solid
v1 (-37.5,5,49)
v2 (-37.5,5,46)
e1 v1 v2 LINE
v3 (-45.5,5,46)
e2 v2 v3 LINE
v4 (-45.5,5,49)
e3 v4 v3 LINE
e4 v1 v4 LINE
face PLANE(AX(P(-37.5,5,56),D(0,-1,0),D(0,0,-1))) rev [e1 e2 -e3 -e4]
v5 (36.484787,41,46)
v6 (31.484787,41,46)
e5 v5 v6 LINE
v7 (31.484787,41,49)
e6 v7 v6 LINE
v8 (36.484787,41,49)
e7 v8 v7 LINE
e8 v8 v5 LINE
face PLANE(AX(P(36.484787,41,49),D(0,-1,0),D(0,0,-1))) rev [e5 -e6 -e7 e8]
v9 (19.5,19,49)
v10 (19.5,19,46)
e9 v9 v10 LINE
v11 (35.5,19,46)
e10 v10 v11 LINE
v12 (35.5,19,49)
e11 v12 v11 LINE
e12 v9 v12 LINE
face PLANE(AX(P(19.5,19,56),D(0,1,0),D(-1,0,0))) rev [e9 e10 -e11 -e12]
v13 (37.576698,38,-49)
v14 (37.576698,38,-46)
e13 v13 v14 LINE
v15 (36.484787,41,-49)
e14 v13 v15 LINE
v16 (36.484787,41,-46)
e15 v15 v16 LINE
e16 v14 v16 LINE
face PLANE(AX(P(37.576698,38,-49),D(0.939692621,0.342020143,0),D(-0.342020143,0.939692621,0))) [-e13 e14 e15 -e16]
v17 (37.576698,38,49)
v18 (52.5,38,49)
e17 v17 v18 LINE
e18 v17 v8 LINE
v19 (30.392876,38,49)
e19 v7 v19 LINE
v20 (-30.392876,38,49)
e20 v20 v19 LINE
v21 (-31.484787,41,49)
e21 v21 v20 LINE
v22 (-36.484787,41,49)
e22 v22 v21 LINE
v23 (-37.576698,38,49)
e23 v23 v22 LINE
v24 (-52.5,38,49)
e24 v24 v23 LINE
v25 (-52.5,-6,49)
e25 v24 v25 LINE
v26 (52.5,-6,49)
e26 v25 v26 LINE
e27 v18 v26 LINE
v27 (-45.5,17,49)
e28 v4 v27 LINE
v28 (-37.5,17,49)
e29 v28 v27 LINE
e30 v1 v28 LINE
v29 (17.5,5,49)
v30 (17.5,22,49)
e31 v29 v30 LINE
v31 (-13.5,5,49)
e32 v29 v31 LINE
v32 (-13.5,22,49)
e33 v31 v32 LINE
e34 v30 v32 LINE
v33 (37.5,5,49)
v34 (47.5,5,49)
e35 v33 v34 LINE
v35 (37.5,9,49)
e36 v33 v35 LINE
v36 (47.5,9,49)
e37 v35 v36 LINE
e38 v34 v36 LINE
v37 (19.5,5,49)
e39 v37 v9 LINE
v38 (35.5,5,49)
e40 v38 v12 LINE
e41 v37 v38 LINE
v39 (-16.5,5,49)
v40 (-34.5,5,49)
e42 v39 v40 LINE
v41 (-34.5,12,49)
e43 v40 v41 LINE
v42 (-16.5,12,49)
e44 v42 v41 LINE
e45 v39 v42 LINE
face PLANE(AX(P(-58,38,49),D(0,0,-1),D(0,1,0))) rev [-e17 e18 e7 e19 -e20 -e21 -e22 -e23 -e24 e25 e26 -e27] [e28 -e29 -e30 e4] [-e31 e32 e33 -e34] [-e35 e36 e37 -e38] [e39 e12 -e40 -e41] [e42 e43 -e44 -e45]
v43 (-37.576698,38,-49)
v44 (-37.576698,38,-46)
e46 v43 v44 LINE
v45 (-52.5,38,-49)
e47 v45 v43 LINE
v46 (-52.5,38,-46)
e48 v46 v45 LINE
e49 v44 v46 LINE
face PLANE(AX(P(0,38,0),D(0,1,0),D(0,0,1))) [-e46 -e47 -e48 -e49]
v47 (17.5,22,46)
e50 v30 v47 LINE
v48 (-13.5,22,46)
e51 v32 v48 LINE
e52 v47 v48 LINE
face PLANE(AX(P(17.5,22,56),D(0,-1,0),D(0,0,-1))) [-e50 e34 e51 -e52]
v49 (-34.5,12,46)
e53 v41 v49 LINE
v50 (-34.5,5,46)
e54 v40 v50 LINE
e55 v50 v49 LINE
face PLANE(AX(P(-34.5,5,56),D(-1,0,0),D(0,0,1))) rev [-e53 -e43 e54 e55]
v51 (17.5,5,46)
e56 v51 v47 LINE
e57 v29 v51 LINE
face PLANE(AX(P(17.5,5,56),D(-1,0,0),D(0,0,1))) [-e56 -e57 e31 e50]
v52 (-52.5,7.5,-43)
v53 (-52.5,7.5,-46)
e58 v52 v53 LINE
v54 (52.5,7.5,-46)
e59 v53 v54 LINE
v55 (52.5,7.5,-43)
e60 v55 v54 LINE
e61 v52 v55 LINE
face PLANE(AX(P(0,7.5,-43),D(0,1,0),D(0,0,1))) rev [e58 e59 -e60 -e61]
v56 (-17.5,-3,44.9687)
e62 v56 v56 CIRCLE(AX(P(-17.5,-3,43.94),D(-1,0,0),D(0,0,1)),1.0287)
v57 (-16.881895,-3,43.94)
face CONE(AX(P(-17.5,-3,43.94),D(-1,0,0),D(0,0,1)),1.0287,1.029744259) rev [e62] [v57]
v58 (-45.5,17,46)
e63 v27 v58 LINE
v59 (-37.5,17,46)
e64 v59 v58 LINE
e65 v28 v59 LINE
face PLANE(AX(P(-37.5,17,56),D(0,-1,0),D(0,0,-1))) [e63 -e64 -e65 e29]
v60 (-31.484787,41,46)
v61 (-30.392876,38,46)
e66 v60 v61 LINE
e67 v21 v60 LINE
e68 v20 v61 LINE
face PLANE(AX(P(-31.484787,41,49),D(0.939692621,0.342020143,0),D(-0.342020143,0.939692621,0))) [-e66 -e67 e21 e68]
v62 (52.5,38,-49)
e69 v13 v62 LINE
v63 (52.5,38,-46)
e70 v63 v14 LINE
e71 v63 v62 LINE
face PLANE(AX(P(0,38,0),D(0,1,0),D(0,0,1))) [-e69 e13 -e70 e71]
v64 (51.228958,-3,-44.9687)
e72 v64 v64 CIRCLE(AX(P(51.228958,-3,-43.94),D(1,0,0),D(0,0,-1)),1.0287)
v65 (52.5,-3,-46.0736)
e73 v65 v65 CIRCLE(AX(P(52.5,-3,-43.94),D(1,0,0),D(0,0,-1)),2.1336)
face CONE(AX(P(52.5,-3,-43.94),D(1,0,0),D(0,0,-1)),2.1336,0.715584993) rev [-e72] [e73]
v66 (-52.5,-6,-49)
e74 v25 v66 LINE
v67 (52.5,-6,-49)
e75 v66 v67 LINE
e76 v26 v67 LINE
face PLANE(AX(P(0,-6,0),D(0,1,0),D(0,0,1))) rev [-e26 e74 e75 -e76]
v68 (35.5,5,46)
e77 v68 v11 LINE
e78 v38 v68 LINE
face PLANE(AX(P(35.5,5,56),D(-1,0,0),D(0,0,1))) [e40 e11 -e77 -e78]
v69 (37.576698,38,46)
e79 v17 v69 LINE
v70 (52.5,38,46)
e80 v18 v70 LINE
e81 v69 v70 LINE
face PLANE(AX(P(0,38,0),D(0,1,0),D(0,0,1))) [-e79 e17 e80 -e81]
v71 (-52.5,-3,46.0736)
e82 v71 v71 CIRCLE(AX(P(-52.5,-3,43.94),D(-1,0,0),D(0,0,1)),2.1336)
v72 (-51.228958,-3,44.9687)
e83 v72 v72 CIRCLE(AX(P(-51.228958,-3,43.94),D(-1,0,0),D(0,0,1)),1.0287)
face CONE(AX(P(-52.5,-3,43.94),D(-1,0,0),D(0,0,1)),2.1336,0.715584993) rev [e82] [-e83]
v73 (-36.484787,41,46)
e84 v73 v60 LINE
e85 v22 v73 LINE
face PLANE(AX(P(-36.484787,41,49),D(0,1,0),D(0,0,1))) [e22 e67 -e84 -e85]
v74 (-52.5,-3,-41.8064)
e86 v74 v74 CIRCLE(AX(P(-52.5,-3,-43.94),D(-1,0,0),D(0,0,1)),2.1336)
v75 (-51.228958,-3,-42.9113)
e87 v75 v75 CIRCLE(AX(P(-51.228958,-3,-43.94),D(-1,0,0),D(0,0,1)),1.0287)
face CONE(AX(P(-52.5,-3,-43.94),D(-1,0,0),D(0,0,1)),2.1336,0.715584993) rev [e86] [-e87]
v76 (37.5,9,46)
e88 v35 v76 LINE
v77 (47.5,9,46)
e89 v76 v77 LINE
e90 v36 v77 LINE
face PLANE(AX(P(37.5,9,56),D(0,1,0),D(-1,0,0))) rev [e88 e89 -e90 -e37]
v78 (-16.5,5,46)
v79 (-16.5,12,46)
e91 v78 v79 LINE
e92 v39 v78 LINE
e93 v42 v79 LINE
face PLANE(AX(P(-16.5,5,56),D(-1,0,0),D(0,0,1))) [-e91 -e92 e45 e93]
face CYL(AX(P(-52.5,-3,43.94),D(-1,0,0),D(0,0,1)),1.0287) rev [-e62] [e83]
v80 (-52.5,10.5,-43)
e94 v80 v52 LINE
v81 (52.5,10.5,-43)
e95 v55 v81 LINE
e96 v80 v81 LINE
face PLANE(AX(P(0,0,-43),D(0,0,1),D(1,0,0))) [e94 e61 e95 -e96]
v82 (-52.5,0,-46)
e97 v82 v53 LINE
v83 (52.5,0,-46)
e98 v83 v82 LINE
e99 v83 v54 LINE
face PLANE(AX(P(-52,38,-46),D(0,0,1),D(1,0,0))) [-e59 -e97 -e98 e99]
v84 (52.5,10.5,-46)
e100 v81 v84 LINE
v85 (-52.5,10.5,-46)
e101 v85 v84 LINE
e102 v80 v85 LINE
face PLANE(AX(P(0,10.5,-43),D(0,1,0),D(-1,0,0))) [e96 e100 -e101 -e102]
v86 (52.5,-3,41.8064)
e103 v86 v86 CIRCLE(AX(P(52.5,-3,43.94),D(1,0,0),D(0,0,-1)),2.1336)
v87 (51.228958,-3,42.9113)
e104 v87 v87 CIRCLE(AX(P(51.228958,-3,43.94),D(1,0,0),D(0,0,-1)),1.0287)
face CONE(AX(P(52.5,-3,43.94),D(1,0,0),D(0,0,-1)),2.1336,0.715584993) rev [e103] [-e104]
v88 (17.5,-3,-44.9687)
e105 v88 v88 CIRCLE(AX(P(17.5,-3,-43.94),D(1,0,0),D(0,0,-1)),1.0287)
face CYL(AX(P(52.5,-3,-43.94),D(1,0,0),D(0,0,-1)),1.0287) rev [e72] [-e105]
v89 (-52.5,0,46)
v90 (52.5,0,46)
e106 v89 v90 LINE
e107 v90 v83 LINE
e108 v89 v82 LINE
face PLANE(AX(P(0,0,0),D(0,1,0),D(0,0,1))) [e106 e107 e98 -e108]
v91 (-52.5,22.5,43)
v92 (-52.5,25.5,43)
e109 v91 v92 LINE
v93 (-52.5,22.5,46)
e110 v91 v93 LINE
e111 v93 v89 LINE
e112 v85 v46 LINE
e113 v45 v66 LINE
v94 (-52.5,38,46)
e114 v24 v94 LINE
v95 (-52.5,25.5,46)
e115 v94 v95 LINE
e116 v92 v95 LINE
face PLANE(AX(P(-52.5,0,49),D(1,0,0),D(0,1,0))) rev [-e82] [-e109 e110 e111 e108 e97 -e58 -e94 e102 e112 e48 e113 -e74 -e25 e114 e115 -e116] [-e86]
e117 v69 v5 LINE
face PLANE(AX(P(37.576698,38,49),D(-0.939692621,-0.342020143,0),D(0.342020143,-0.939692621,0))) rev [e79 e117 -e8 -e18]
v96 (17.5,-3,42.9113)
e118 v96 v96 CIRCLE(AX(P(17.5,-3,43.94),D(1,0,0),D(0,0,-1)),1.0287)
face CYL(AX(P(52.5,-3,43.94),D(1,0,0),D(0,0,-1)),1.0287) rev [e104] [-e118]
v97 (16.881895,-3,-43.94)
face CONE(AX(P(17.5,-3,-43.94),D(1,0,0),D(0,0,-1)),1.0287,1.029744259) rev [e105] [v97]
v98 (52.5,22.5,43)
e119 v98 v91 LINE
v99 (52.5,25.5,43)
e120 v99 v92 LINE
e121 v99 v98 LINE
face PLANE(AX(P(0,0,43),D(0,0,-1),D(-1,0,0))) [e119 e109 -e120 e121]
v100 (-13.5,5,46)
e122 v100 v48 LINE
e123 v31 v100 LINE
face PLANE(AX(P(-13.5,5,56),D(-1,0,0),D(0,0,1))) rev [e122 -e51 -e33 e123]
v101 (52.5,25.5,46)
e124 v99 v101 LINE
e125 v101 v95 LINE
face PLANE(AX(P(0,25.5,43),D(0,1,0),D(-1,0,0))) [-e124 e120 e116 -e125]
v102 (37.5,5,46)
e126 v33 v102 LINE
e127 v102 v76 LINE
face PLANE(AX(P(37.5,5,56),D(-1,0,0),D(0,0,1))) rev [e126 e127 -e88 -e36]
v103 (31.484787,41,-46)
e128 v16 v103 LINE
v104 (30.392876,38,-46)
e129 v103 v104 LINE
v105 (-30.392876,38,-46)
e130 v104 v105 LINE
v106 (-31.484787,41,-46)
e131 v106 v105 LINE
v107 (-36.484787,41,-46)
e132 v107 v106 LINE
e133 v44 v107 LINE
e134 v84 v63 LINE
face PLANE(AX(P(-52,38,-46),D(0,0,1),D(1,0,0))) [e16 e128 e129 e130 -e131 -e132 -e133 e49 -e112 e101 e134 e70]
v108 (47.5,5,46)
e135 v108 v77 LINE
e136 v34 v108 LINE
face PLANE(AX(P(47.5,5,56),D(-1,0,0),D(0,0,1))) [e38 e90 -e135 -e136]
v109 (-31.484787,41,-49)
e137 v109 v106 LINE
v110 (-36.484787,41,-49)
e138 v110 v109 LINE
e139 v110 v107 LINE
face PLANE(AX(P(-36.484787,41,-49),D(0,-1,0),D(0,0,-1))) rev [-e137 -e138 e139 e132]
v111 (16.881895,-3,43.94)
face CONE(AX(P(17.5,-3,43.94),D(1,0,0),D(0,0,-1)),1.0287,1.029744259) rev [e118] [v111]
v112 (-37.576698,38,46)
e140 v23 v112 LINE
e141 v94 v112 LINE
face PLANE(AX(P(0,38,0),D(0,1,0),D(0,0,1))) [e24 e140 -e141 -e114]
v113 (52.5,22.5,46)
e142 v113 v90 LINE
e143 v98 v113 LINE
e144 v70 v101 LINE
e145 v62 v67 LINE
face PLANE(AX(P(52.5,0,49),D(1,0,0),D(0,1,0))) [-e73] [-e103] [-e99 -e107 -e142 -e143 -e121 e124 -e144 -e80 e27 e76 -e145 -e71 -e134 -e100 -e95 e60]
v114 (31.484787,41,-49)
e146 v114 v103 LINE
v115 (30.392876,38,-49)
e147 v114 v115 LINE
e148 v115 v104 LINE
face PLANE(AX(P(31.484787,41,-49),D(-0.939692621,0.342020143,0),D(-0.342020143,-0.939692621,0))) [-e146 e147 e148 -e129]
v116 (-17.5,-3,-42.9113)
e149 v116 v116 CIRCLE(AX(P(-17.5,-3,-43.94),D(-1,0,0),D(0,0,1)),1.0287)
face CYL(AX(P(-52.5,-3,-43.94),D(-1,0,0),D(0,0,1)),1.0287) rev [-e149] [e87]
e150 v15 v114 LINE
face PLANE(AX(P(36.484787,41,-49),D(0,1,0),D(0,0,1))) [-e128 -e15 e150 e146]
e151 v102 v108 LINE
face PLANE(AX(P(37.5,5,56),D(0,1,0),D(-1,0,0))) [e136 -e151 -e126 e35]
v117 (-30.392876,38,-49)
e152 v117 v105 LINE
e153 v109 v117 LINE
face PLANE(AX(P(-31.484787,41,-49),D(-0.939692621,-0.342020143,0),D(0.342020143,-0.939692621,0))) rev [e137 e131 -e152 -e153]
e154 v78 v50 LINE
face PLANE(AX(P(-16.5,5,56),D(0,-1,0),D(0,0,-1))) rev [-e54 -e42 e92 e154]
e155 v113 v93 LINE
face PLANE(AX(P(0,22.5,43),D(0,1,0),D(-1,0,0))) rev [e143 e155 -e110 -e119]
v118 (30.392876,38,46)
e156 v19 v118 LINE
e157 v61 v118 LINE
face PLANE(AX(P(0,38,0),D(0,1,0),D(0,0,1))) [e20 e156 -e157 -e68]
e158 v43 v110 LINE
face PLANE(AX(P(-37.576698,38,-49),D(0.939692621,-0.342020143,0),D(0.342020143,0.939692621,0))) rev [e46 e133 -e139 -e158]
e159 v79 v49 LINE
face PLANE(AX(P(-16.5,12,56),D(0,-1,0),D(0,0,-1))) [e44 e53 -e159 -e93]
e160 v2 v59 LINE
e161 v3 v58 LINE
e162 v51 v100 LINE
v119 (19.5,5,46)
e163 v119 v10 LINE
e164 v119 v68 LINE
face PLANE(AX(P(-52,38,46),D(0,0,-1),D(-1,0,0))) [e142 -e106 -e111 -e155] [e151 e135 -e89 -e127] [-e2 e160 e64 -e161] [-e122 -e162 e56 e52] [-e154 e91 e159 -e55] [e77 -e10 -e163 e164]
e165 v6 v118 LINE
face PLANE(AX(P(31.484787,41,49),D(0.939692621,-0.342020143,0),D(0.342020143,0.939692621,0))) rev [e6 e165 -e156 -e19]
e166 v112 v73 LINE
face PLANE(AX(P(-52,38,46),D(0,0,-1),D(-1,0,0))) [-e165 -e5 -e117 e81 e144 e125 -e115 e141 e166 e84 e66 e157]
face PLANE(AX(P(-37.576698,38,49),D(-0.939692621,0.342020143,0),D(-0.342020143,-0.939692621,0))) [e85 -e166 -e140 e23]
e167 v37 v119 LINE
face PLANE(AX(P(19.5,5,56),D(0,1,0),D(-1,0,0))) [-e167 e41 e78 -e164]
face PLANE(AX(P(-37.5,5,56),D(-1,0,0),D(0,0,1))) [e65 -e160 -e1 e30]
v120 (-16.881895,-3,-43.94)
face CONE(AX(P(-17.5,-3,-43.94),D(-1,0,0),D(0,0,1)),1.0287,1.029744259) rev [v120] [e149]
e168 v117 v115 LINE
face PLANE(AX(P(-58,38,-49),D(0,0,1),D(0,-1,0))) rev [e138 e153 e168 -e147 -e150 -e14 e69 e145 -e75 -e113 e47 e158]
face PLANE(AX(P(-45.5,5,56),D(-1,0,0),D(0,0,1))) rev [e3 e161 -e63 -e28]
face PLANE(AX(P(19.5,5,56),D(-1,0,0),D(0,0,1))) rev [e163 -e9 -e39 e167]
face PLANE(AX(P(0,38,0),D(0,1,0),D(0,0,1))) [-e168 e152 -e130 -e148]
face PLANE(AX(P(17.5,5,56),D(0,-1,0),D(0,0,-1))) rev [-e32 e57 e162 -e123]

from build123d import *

# Parameters (mm, degrees)
SKETCH1_W               = 104
SKETCH1_H               = 92
BOSS_EXTRUDE1_DEPTH     = 38
SHELL1_T                = 6
SKETCH15_W              = 3
SKETCH15_H              = 44
CUT_EXTRUDE4_DEPTH      = 133.680066325
SKETCH3_W               = 8
SKETCH3_H               = 12
SKETCH3_W_2             = 18
SKETCH3_H_2             = 7
SKETCH3_W_3             = 16
SKETCH3_H_3             = 14
SKETCH3_W_4             = 31
SKETCH3_H_4             = 17
SKETCH3_W_5             = 10
SKETCH3_H_5             = 4
CUT_EXTRUDE2_DEPTH      = 10
CUT_EXTRUDE5_DEPTH      = 118.613774703
CUT_EXTRUDE5_DEPTH_BACK = 118.613774703
SKETCH3_3_W             = 5.5
SKETCH3_3_H             = 44
CUT_EXTRUDE3_DEPTH      = 122.512345052
CUT_EXTRUDE3_DEPTH_BACK = 122.512345052
BOSS_EXTRUDE2_DEPTH     = 3
BOSS_EXTRUDE3_START     = -3
BOSS_EXTRUDE3_OUTLINE_W = 105
BOSS_EXTRUDE3_OUTLINE_H = 3
BOSS_EXTRUDE3_DEPTH     = 3
BOSS_EXTRUDE4_START     = -3
BOSS_EXTRUDE4_OUTLINE_W = 105
BOSS_EXTRUDE4_OUTLINE_H = 3
BOSS_EXTRUDE4_DEPTH     = 3


# Read off the part's stored shape, not the designer's step: Boss-Extrude3, Boss-Extrude4
with BuildPart() as part:
    # Sketch1 → Boss-Extrude1 (new body)
    with BuildSketch(Plane(origin=(0, 0, 0), x_dir=(1, 0, 0), z_dir=(0, 1, 0))):
        Rectangle(SKETCH1_W, SKETCH1_H)
    extrude(amount=BOSS_EXTRUDE1_DEPTH)

    # Shell1
    shell1_openings = [part.faces().sort_by_distance(p)[0] for p in [
        (0, 38, 0),
    ]]
    offset(amount=SHELL1_T, openings=shell1_openings, kind=Kind.INTERSECTION)

    # Sketch15 → Cut-Extrude4 (cut, through all)
    with BuildSketch(Plane(origin=(58, 0, 0), x_dir=(0, 0, -1), z_dir=(1, 0, 0))):
        with Locations((-50.5, 16)):
            Rectangle(SKETCH15_W, SKETCH15_H)
        with Locations((50.5, 16)):
            Rectangle(SKETCH15_W, SKETCH15_H)
    extrude(amount=-CUT_EXTRUDE4_DEPTH, mode=Mode.SUBTRACT)

    # Sketch3 → Cut-Extrude2 (cut)
    with BuildSketch(Plane(origin=(0, 0, 46), x_dir=(-1, 0, 0), z_dir=(0, 0, -1))):
        with Locations((41.5, 11)):
            Rectangle(SKETCH3_W, SKETCH3_H)
        with Locations((25.5, 8.5)):
            Rectangle(SKETCH3_W_2, SKETCH3_H_2)
        with Locations((-27.5, 12)):
            Rectangle(SKETCH3_W_3, SKETCH3_H_3)
        with Locations((-2, 13.5)):
            Rectangle(SKETCH3_W_4, SKETCH3_H_4)
        with Locations((-42.5, 7)):
            Rectangle(SKETCH3_W_5, SKETCH3_H_5)
    extrude(amount=-CUT_EXTRUDE2_DEPTH, mode=Mode.SUBTRACT)

    # Sketch3<3> → Cut-Extrude5 (cut, two sides: drawn at the far end of the back side and taken through both)
    with BuildSketch(Plane(origin=(0, 0, 46), x_dir=(-1, 0, 0), z_dir=(0, 0, -1)).offset(-CUT_EXTRUDE5_DEPTH_BACK)):
        with Locations((55.25, 16)):
            Rectangle(SKETCH3_3_W, SKETCH3_3_H)
        with Locations((-55.25, 16)):
            Rectangle(SKETCH3_3_W, SKETCH3_3_H)
    extrude(amount=CUT_EXTRUDE5_DEPTH + CUT_EXTRUDE5_DEPTH_BACK, mode=Mode.SUBTRACT)

    # Sketch4 → Cut-Extrude3 (cut, two sides: drawn at the far end of the back side and taken through both)
    with BuildSketch(Plane(origin=(-52, 0, 0), x_dir=(0, 0, -1), z_dir=(1, 0, 0)).offset(-CUT_EXTRUDE3_DEPTH_BACK)):
        Polygon((-46, 257.389589044), (-46, 38), (-46, 0), (46, 0), (46, 38), (46, 257.389589044), (46, 696.168767132), (-46, 696.168767132), align=None)
    extrude(amount=CUT_EXTRUDE3_DEPTH + CUT_EXTRUDE3_DEPTH_BACK, mode=Mode.SUBTRACT)

    # Sketch10 → Boss-Extrude2 (add)
    with BuildSketch(Plane(origin=(0, 0, 46), x_dir=(-1, 0, 0), z_dir=(0, 0, -1))):
        Polygon((-37.576697733, 38), (-30.392876327, 38), (-31.48478703, 41), (-36.48478703, 41), align=None)
        Polygon((31.48478703, 41), (30.392876327, 38), (37.576697733, 38), (36.48478703, 41), align=None)
    boss_extrude2 = extrude(amount=-BOSS_EXTRUDE2_DEPTH)

    # Mirror3: Boss-Extrude2 across plane
    add(boss_extrude2.mirror(Plane.XY))

    # Boss-Extrude3 outline → Boss-Extrude3 (add)
    with BuildSketch(Plane(origin=(0, 0, -46), x_dir=(-1, 0, 0), z_dir=(0, 0, -1)).offset(BOSS_EXTRUDE3_START)):
        with Locations((0, 9)):
            Rectangle(BOSS_EXTRUDE3_OUTLINE_W, BOSS_EXTRUDE3_OUTLINE_H)
    extrude(amount=BOSS_EXTRUDE3_DEPTH)

    # Boss-Extrude4 outline → Boss-Extrude4 (add)
    with BuildSketch(Plane.XY.offset(46).offset(BOSS_EXTRUDE4_START)):
        with Locations((0, 24)):
            Rectangle(BOSS_EXTRUDE4_OUTLINE_W, BOSS_EXTRUDE4_OUTLINE_H)
    extrude(amount=BOSS_EXTRUDE4_DEPTH)

    # Sketch19 → CSK for #1 Flat Head Socket Cap Screw2 (revolve, cut)
    with BuildSketch(Plane(origin=(52.5, -3, 43.94), x_dir=(0, 0, -1), z_dir=(0, 1, 0))):
        Polygon((0, 0), (0, 35.618105319), (1.0287, 35), (1.0287, 1.271042053), (2.1336, 0), align=None)
    csk_for_1_flat_head_socket_cap_screw2 = revolve(axis=Axis((58.85, -3, 43.94), (-1, 0, 0)), mode=Mode.SUBTRACT)

    # Mirror4: CSK for #1 Flat Head Socket Cap Screw2 across plane
    add(csk_for_1_flat_head_socket_cap_screw2.mirror(Plane(origin=(0, 0, 0), x_dir=(0, 0, 1), z_dir=(1, 0, 0))), mode=Mode.SUBTRACT)

    # Mirror4 at the second plane: CSK for #1 Flat Head Socket Cap Screw2 across plane
    add(csk_for_1_flat_head_socket_cap_screw2.mirror(Plane.XY), mode=Mode.SUBTRACT)

    # Mirror4 at the second plane copy 1 sketc → Mirror4 at the second plane copy 1 (revolve, cut)
    with BuildSketch(Plane(origin=(-52.5, -3, -43.94), x_dir=(0, 0, 1), z_dir=(0, 1, 0))):
        Polygon((0, 0), (0, 35.618105319), (1.0287, 35), (1.0287, 1.271042053), (2.1336, 0), align=None)
    revolve(axis=Axis((-58.85, -3, -43.94), (1, 0, 0)), mode=Mode.SUBTRACT)


solid = part.part
